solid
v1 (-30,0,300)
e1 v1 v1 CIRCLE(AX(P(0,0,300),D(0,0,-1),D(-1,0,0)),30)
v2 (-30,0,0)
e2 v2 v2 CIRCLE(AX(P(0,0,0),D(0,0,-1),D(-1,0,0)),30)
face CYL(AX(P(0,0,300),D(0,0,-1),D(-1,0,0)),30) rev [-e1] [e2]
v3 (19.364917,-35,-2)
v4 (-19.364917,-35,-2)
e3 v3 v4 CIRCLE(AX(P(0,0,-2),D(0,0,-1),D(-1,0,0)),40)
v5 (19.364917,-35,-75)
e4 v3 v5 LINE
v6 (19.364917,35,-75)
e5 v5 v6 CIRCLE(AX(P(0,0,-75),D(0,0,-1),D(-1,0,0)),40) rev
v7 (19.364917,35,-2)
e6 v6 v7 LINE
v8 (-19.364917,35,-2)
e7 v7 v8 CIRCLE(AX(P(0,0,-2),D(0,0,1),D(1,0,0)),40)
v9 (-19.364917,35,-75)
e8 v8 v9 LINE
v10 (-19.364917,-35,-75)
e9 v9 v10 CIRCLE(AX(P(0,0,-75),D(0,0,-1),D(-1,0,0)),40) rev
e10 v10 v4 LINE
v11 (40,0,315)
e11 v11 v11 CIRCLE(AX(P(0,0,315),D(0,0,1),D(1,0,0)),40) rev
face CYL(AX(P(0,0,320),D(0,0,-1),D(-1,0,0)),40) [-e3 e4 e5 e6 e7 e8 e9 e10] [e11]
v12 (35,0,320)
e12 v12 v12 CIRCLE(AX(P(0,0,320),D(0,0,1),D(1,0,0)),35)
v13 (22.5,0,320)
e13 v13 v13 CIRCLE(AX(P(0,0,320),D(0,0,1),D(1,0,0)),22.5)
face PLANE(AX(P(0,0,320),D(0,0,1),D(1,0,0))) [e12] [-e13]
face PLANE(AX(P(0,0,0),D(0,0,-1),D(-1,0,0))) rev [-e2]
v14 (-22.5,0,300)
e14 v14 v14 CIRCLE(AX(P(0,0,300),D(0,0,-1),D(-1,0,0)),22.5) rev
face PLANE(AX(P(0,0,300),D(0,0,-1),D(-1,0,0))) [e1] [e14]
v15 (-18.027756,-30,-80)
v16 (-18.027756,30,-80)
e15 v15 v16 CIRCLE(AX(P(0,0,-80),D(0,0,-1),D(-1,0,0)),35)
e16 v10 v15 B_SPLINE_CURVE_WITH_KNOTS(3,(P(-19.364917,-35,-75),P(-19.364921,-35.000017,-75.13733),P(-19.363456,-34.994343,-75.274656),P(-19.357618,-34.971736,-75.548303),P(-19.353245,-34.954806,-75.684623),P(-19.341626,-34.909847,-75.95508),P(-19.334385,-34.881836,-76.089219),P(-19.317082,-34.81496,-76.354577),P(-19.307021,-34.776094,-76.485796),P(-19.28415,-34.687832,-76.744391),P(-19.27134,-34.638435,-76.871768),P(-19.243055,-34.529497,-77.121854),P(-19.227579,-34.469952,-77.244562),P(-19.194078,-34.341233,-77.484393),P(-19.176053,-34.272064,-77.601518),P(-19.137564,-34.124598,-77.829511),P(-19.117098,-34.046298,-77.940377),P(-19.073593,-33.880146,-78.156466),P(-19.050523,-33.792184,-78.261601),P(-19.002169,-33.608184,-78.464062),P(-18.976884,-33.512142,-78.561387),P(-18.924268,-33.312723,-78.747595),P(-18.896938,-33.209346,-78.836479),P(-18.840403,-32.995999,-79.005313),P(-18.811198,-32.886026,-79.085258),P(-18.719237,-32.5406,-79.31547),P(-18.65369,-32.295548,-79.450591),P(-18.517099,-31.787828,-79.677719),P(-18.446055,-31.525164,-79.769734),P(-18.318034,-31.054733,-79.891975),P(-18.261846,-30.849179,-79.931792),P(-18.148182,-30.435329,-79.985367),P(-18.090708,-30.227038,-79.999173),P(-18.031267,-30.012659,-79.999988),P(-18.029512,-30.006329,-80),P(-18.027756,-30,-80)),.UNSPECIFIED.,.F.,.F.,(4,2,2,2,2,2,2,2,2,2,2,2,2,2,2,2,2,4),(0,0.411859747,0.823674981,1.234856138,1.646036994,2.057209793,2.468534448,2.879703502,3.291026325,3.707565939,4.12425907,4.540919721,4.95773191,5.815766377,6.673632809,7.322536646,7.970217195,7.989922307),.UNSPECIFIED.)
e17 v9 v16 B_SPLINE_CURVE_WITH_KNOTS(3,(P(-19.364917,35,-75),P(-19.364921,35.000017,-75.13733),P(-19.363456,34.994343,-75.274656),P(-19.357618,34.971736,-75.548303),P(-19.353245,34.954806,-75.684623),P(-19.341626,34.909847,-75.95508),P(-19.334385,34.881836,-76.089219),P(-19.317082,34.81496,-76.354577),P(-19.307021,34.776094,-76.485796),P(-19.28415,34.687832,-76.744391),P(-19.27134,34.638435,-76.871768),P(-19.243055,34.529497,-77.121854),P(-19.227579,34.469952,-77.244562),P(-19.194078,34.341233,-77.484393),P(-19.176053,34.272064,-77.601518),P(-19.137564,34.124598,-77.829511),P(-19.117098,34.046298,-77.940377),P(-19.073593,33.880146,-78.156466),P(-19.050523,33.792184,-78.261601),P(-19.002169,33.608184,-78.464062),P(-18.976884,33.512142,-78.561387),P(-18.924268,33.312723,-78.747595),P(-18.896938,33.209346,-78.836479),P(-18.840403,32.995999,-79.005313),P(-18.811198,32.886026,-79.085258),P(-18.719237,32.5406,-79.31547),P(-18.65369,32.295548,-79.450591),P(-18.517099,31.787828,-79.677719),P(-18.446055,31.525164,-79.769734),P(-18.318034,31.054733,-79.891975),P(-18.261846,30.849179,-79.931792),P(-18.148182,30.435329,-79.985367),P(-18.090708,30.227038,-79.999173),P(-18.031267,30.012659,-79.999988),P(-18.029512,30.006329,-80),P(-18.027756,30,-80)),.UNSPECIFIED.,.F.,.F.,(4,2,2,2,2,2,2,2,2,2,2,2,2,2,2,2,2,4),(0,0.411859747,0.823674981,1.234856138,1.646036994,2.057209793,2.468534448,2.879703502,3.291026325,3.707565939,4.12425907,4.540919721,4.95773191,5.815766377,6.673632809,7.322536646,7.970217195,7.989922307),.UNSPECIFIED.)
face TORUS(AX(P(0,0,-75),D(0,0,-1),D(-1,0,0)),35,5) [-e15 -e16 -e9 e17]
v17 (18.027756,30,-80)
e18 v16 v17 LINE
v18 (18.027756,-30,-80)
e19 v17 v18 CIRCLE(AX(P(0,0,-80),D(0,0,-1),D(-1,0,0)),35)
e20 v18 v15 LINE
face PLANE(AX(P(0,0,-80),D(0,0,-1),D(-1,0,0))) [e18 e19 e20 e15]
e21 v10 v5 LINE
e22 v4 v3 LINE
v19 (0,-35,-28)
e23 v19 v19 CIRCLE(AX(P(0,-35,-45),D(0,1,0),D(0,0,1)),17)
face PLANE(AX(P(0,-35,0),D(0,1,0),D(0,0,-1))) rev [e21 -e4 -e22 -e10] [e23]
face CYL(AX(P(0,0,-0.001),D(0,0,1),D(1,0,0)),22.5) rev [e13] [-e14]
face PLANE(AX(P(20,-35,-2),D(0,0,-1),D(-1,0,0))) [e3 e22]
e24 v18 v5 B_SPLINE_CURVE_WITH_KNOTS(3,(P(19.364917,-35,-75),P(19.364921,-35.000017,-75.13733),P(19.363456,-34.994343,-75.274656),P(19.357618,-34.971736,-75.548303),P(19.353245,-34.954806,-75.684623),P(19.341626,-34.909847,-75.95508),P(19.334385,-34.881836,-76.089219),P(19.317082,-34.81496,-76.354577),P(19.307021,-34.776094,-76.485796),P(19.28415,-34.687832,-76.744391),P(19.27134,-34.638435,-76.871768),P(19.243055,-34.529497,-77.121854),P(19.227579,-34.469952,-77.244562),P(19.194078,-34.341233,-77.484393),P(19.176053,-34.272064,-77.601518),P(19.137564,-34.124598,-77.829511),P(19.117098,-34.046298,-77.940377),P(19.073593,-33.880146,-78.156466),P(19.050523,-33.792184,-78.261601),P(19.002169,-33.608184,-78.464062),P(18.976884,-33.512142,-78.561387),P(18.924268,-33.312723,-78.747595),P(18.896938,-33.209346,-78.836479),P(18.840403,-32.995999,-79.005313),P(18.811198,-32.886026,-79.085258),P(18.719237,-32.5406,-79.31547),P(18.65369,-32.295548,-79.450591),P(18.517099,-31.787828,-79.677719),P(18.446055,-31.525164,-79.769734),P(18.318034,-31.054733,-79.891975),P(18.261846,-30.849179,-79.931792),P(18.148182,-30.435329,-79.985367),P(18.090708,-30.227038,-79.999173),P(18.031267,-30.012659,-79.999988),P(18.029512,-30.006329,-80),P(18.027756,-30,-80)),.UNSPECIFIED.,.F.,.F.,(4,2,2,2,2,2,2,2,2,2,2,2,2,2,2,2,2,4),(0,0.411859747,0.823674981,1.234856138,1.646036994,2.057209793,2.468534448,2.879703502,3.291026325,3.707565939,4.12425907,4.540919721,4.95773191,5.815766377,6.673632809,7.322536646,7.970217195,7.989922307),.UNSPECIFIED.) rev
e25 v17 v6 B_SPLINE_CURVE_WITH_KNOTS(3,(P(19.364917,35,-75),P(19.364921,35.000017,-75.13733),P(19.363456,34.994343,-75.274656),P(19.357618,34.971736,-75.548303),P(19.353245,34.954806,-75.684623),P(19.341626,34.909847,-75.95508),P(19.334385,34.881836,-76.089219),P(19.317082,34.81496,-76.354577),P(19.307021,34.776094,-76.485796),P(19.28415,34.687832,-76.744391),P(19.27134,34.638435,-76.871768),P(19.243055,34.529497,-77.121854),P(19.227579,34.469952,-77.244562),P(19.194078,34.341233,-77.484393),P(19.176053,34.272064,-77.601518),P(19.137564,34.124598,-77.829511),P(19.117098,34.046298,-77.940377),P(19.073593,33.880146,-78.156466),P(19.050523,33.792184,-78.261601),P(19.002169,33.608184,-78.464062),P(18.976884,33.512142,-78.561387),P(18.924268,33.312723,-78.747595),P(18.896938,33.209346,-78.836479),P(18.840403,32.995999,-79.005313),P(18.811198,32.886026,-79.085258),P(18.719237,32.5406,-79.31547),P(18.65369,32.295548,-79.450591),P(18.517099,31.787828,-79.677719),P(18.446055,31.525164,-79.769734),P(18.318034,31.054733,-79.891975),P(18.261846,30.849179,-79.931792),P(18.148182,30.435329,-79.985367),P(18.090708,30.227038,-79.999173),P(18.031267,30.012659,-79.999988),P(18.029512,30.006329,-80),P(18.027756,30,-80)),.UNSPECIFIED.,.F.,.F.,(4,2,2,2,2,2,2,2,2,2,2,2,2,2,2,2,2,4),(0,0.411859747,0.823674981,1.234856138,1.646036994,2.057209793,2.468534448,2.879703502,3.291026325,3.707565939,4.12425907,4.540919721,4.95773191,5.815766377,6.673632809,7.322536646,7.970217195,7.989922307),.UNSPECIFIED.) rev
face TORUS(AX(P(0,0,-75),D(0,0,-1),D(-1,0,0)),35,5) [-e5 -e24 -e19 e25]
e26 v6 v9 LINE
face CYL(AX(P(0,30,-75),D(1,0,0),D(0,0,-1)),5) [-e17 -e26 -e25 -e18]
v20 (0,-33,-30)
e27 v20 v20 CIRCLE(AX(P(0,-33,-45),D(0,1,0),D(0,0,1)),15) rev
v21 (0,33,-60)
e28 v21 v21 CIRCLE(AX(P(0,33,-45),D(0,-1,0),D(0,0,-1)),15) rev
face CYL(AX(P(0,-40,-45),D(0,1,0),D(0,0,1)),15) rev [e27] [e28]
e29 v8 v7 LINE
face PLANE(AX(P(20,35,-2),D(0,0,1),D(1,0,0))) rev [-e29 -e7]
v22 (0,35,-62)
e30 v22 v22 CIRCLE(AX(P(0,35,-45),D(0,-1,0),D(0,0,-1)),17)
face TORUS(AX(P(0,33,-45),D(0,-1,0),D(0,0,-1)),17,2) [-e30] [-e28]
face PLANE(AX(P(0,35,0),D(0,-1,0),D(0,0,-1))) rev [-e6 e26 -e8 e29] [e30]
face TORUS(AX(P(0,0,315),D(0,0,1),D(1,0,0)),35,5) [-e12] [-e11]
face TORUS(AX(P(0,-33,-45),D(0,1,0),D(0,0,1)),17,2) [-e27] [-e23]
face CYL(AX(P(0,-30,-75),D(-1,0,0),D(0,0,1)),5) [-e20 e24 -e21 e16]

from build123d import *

# Parameters (mm, degrees)
SKETCH2_R           = 40
BOSS_EXTRUDE1_DEPTH = 320
SKETCH3_R           = 30
CUT_EXTRUDE1_DEPTH  = 300
CUT_EXTRUDE2_REACH  = 326.962
SKETCH4_R           = 22.5
BOSS_EXTRUDE2_START = 80
SKETCH5_R           = 40
BOSS_EXTRUDE2_DEPTH = 80
SKETCH6_W           = 40
SKETCH6_H           = 78
CUT_EXTRUDE3_DEPTH  = 5
SKETCH7_R           = 15
CUT_EXTRUDE4_DEPTH  = 332.096662623
FILLET2_R           = 5
FILLET3_R           = 2


with BuildPart() as part:
    # Sketch2 → Boss-Extrude1 (new body)
    with BuildSketch(Plane.XY):
        Circle(SKETCH2_R)
    extrude(amount=BOSS_EXTRUDE1_DEPTH)

    # Sketch3 → Cut-Extrude1 (cut)
    with BuildSketch(Plane(origin=(0, 0, 0), x_dir=(-1, 0, 0), z_dir=(0, 0, -1))):
        Circle(SKETCH3_R)
    extrude(amount=-CUT_EXTRUDE1_DEPTH, mode=Mode.SUBTRACT)

    # Sketch4 → Cut-Extrude2 (cut, up to next)
    with BuildSketch(Plane.XY.offset(320), mode=Mode.PRIVATE) as cut_extrude2_sk1:
        Circle(SKETCH4_R)
    cut_extrude2_tool1 = extrude(cut_extrude2_sk1.sketch, amount=-CUT_EXTRUDE2_REACH, mode=Mode.PRIVATE) & part.part
    add(cut_extrude2_tool1.solids().sort_by_distance((0, 0, 320))[0], mode=Mode.SUBTRACT)

    # Sketch5 → Boss-Extrude2 (add)
    with BuildSketch(Plane(origin=(0, 0, 0), x_dir=(-1, 0, 0), z_dir=(0, 0, -1)).offset(BOSS_EXTRUDE2_START)):
        Circle(SKETCH5_R)
    extrude(amount=-BOSS_EXTRUDE2_DEPTH)

    # Sketch6 → Cut-Extrude3 (cut)
    with BuildSketch(Plane(origin=(0, 40, 0), x_dir=(1, 0, 0), z_dir=(0, 1, 0))):
        with Locations((0, 41)):
            Rectangle(SKETCH6_W, SKETCH6_H)
    cut_extrude3 = extrude(amount=-CUT_EXTRUDE3_DEPTH, mode=Mode.SUBTRACT)

    # Mirror1: Cut-Extrude3 across plane
    add(cut_extrude3.mirror(Plane.ZX), mode=Mode.SUBTRACT)

    # Sketch7 → Cut-Extrude4 (cut, through all)
    with BuildSketch(Plane(origin=(0, 35, 0), x_dir=(1, 0, 0), z_dir=(0, 1, 0))):
        with Locations(Location((0, 45, 0), (0, 0, 270))):
            Circle(SKETCH7_R)
    extrude(amount=-CUT_EXTRUDE4_DEPTH, mode=Mode.SUBTRACT)

    # Fillet2
    fillet2_edges = [part.edges().sort_by_distance(p)[0] for p in [
        (40, 0, -80),
        (0, 35, -80),
        (-34.457195687, 20.315060063, -80),
        (0, -35, -80),
        (-40, 0, 320),
    ]]
    fillet(fillet2_edges, radius=FILLET2_R - 0.0001)  # a hair under: the kernel refuses the full size

    # Fillet3
    fillet3_edges = [part.edges().sort_by_distance(p)[0] for p in [
        (0, -35, -60),
        (0, 35, -60),
    ]]
    fillet(fillet3_edges, radius=FILLET3_R)


solid = part.part
